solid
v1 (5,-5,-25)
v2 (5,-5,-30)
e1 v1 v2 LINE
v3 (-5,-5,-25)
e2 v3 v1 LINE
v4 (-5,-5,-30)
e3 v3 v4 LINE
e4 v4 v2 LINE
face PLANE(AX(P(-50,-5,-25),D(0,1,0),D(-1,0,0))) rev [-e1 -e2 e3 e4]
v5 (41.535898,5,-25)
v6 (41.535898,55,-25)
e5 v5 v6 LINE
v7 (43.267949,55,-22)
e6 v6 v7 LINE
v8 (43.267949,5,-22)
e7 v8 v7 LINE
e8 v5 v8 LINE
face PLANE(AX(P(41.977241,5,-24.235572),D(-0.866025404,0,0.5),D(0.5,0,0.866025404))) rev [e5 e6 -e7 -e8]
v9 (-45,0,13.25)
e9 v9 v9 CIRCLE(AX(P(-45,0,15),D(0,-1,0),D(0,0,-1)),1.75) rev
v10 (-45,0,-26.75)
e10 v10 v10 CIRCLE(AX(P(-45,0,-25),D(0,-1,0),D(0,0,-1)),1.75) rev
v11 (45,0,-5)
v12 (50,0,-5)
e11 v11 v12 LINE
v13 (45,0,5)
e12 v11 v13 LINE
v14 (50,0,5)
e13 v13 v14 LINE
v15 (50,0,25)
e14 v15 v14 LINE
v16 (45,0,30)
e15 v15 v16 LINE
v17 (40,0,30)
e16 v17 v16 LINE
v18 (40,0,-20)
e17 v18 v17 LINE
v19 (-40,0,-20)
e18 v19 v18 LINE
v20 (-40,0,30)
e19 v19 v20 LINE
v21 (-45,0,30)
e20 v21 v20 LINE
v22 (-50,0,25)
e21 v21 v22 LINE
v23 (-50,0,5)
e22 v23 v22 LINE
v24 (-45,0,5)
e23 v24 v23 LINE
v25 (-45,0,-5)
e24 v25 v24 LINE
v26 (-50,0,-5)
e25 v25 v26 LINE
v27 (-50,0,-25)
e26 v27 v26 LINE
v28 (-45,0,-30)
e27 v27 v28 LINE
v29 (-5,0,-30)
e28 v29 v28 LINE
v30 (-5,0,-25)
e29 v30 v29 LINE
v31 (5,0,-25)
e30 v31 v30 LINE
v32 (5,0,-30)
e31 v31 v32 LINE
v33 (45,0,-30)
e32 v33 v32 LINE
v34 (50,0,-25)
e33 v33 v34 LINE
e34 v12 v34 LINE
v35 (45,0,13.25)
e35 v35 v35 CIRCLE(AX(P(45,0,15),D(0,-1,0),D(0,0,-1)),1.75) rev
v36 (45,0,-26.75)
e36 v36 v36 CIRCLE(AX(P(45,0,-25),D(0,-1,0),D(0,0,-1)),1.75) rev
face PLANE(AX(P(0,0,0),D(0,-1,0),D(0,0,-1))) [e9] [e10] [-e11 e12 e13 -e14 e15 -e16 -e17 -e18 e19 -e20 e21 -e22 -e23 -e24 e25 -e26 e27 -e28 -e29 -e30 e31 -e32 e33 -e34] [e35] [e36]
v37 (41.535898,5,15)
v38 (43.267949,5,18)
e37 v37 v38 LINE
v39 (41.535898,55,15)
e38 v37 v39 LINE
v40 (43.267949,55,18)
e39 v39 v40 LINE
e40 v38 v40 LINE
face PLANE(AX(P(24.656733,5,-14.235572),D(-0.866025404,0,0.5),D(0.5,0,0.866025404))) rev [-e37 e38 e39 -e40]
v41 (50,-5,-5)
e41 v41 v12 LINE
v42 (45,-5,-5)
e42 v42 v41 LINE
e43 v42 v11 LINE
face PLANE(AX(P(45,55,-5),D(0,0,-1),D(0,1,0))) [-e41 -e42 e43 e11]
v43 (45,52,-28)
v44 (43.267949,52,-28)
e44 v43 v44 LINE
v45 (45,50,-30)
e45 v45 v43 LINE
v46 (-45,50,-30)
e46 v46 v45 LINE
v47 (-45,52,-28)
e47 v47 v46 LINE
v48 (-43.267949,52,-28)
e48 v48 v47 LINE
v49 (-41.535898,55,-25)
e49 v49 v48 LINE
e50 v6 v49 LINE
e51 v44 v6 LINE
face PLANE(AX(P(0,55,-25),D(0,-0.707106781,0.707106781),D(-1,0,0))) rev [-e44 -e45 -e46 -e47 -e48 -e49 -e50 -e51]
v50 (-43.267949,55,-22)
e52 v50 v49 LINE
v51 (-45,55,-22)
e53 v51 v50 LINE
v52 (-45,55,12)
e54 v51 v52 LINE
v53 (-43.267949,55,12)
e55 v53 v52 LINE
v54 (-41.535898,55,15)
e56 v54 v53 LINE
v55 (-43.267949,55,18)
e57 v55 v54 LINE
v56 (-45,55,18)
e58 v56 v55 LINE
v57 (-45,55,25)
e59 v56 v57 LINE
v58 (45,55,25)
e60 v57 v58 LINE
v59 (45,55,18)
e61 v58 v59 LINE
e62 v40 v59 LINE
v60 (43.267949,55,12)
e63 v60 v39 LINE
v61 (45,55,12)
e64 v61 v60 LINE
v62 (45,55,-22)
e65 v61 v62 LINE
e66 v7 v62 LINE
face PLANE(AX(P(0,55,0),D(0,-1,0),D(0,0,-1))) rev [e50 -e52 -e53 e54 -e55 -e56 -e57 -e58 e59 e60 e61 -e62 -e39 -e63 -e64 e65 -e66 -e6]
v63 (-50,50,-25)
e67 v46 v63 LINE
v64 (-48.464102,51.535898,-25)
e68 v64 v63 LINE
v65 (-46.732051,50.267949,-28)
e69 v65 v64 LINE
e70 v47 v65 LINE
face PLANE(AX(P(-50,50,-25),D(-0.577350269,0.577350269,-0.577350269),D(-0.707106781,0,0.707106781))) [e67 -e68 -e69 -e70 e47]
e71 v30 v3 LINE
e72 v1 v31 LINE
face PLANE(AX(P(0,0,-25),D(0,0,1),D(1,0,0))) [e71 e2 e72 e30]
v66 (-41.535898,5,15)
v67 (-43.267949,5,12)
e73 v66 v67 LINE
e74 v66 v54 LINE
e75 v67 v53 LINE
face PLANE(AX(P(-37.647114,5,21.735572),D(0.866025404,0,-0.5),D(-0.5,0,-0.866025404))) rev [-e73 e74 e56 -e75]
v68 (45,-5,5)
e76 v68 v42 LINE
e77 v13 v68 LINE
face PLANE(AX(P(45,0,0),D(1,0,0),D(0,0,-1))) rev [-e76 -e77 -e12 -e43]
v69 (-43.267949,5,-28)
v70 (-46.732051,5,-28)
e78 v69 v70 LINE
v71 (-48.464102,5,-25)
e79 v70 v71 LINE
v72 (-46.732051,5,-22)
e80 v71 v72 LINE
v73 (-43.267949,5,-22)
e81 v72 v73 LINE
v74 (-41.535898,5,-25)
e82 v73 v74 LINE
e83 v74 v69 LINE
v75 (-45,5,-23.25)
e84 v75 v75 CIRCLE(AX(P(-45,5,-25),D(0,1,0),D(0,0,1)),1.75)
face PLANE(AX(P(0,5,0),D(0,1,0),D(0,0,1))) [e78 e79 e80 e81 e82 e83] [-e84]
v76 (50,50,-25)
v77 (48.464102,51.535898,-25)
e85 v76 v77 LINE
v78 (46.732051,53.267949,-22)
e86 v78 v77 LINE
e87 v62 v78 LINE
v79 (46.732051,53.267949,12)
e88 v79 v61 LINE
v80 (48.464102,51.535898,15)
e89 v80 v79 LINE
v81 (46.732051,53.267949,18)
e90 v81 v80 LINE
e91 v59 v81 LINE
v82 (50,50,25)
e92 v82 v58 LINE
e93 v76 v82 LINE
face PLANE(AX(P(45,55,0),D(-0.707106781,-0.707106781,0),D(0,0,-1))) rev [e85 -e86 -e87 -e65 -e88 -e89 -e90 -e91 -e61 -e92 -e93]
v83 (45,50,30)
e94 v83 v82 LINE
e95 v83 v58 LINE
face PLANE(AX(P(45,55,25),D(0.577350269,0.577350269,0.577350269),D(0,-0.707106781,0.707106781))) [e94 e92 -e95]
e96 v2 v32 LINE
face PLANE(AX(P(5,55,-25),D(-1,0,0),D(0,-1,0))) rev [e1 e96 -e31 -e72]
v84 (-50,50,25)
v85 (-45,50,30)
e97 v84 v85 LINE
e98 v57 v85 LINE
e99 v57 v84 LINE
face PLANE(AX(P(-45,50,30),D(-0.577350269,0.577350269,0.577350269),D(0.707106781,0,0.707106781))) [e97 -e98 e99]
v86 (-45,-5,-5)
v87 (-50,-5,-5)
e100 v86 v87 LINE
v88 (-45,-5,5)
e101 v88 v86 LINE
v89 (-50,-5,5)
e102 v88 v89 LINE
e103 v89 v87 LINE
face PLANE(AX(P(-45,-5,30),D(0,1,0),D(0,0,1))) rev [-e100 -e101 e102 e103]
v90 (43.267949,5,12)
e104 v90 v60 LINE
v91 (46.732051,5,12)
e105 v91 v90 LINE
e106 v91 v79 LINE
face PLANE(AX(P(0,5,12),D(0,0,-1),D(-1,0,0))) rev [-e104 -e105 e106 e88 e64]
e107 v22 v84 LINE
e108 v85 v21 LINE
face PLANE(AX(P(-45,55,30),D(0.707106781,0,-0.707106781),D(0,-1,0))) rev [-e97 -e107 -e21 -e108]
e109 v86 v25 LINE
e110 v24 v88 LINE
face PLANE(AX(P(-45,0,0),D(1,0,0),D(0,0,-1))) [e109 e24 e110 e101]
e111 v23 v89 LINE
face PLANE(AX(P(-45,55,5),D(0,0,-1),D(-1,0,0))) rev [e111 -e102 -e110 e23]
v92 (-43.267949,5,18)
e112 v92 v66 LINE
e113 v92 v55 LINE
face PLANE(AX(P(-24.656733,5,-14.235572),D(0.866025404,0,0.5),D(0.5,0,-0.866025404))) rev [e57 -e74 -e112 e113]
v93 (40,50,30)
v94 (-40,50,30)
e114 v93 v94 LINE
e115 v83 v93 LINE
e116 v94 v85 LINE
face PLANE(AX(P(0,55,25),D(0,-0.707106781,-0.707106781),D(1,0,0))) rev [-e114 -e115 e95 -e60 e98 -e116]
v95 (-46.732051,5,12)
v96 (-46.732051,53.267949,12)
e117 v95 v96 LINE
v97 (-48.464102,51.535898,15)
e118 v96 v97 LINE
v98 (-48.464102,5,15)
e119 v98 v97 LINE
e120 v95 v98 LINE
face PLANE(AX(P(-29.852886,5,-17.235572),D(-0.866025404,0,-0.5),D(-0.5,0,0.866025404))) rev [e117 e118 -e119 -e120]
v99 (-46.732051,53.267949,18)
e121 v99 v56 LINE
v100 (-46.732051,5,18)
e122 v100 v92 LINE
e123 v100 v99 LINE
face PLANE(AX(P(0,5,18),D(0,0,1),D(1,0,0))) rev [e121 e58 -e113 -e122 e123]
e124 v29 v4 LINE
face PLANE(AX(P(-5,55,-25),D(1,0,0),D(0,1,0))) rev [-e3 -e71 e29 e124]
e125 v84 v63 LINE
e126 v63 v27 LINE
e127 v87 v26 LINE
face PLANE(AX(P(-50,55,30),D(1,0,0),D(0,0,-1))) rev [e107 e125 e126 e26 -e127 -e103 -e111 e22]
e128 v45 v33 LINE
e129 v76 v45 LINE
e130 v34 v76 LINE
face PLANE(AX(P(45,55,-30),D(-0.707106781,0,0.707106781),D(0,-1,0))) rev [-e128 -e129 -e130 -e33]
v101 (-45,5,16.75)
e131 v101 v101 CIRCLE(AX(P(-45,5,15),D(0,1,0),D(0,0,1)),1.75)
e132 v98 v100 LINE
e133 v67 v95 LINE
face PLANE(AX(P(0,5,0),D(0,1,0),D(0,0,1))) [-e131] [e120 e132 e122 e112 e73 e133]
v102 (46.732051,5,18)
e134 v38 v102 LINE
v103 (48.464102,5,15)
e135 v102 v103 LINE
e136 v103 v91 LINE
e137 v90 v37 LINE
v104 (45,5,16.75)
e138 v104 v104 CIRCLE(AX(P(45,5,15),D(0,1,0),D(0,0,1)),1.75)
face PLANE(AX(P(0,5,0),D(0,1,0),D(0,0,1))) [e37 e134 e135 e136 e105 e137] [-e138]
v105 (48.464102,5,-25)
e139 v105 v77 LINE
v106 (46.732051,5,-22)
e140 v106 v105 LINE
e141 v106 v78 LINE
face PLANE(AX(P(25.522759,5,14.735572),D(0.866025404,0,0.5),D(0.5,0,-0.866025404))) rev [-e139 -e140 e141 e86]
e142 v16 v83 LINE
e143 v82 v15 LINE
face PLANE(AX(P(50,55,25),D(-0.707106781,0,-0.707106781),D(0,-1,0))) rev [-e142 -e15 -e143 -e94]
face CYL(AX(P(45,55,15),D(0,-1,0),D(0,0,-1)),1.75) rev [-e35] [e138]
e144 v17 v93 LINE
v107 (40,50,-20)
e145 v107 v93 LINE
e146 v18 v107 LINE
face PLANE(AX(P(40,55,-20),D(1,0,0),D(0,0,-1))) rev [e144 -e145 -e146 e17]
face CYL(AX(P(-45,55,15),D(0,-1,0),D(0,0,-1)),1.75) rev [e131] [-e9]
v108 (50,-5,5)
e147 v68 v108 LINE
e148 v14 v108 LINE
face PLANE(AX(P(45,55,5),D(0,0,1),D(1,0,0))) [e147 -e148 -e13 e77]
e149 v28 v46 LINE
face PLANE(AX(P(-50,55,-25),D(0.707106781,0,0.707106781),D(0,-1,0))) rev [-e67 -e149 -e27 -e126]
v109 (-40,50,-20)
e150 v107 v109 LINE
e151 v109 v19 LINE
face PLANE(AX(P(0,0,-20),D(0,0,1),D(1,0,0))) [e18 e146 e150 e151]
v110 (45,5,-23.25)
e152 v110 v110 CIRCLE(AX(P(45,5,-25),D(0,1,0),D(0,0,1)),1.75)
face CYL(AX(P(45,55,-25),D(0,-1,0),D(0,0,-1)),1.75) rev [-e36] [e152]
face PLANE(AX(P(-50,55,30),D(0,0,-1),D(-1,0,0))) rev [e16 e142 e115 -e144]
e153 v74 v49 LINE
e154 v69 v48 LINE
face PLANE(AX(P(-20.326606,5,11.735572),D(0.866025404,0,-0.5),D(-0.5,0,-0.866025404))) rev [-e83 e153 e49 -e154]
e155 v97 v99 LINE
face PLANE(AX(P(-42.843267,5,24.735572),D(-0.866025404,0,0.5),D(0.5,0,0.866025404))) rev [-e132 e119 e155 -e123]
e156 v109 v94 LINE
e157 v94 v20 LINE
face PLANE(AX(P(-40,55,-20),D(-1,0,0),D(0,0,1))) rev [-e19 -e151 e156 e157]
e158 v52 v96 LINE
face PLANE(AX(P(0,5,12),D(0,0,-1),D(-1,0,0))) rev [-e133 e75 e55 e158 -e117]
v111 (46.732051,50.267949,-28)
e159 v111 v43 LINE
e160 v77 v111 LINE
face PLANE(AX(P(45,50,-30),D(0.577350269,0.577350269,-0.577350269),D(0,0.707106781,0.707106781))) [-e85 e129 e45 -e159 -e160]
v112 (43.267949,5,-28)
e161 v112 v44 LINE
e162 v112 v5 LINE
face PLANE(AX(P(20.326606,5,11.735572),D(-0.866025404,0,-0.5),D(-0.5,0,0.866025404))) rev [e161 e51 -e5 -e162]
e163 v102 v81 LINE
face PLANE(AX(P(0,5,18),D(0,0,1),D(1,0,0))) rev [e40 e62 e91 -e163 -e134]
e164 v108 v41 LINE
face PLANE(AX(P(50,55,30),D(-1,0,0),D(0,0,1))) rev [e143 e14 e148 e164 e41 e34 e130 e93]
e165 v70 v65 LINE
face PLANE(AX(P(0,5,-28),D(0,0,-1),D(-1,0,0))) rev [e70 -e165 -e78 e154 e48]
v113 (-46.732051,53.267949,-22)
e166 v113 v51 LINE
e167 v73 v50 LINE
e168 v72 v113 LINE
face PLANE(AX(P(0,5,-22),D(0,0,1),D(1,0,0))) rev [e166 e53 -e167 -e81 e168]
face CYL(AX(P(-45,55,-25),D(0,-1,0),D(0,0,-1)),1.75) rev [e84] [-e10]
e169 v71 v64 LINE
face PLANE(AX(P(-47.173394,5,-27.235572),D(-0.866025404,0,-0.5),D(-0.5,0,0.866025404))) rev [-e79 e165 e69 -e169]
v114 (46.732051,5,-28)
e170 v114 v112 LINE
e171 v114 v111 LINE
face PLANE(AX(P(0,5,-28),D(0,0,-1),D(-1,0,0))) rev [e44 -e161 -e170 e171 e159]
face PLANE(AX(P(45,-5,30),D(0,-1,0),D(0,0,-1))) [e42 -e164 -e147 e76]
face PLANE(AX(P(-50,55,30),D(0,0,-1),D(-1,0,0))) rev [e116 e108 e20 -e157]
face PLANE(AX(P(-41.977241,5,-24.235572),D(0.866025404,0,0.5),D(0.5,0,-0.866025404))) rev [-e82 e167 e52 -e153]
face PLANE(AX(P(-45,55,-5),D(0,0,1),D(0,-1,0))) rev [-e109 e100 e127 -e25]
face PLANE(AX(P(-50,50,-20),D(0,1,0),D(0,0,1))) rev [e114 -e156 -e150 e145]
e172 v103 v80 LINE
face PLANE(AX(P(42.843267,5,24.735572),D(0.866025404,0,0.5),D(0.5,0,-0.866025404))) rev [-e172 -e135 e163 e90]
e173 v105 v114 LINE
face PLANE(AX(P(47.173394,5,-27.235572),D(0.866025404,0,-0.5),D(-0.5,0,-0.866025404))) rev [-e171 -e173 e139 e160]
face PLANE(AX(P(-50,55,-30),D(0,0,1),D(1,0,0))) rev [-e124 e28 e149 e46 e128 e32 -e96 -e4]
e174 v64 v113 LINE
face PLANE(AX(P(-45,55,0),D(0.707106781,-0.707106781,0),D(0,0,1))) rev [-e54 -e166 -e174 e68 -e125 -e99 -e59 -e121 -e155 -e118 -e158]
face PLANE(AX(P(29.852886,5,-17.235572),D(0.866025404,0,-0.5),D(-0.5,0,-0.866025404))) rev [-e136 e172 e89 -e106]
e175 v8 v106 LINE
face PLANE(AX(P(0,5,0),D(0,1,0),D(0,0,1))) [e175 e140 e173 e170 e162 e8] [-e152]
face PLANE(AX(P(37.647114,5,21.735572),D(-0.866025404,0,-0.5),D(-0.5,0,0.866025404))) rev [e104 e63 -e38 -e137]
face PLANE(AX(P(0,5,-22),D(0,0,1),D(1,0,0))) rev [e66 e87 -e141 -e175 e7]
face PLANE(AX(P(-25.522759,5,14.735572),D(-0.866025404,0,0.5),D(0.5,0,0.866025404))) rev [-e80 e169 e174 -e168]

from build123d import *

# Parameters (mm, degrees)
SKETCH1_W               = 100
SKETCH1_H               = 60
BOSS_EXTRUDE1_DEPTH     = 55
CUT_EXTRUDE1_START      = 30
SKETCH2_W               = 80
SKETCH2_H               = 50
CUT_EXTRUDE1_DEPTH      = 50
CHAMFER2_SIZE           = 5
CUT_EXTRUDE2_DEPTH      = 81.156097709
CUT_EXTRUDE2_DEPTH_BACK = 81.156097709
SKETCH3_R               = 1.75
CUT_EXTRUDE3_START      = 55
CUT_EXTRUDE3_DEPTH      = 50
BOSS_EXTRUDE2_START     = -50
SKETCH5_W               = 10
SKETCH5_H               = 5
BOSS_EXTRUDE2_DEPTH     = 5
BOSS_EXTRUDE3_START     = 50
SKETCH5_2_W             = 10
SKETCH5_2_H             = 5
BOSS_EXTRUDE3_DEPTH     = 5
BOSS_EXTRUDE4_START     = -30
SKETCH7_W               = 10
SKETCH7_H               = 5
BOSS_EXTRUDE4_DEPTH     = 5


with BuildPart() as part:
    # Sketch1 → Boss-Extrude1 (new body)
    with BuildSketch(Plane(origin=(0, 0, 0), x_dir=(1, 0, 0), z_dir=(0, 1, 0))):
        Rectangle(SKETCH1_W, SKETCH1_H)
    extrude(amount=BOSS_EXTRUDE1_DEPTH)

    # Sketch2 → Cut-Extrude1 (cut)
    with BuildSketch(Plane.XY.offset(CUT_EXTRUDE1_START)):
        with Locations((0, 25)):
            Rectangle(SKETCH2_W, SKETCH2_H)
    extrude(amount=-CUT_EXTRUDE1_DEPTH, mode=Mode.SUBTRACT)

    # Chamfer2
    chamfer2_edges = [part.edges().sort_by_distance(p)[0] for p in [
        (-50, 55, 0),
        (0, 55, 30),
        (50, 55, 0),
        (50, 27.5, 30),
        (-50, 27.5, 30),
        (-50, 27.5, -30),
        (50, 27.5, -30),
        (0, 55, -30),
    ]]
    chamfer(chamfer2_edges, length=CHAMFER2_SIZE - 0.0001)  # a hair under: the kernel refuses the full size

    # Sketch3 → Cut-Extrude2 (cut, two sides: drawn at the far end of the back side and taken through both)
    with BuildSketch(Plane(origin=(0, 0, 0), x_dir=(1, 0, 0), z_dir=(0, 1, 0)).offset(-CUT_EXTRUDE2_DEPTH_BACK)):
        with Locations(Location((-45, 25, 0), (0, 0, 90))):
            Circle(SKETCH3_R)
        with Locations(Location((45, 25, 0), (0, 0, 90))):
            Circle(SKETCH3_R)
        with Locations(Location((45, -15, 0), (0, 0, 90))):
            Circle(SKETCH3_R)
        with Locations(Location((-45, -15, 0), (0, 0, 90))):
            Circle(SKETCH3_R)
    extrude(amount=CUT_EXTRUDE2_DEPTH + CUT_EXTRUDE2_DEPTH_BACK, mode=Mode.SUBTRACT)

    # Sketch4 → Cut-Extrude3 (cut)
    with BuildSketch(Plane(origin=(0, 0, 0), x_dir=(1, 0, 0), z_dir=(0, 1, 0)).offset(CUT_EXTRUDE3_START)):
        Polygon((-41.535898385, 25), (-43.267949192, 28), (-46.732050808, 28), (-48.464101615, 25), (-46.732050808, 22), (-43.267949192, 22), align=None)
        Polygon((-41.535898385, -15), (-43.267949192, -12), (-46.732050808, -12), (-48.464101615, -15), (-46.732050808, -18), (-43.267949192, -18), align=None)
        Polygon((48.464101615, 25), (46.732050808, 28), (43.267949192, 28), (41.535898385, 25), (43.267949192, 22), (46.732050808, 22), align=None)
        Polygon((48.464101615, -15), (46.732050808, -12), (43.267949192, -12), (41.535898385, -15), (43.267949192, -18), (46.732050808, -18), align=None)
    extrude(amount=-CUT_EXTRUDE3_DEPTH, mode=Mode.SUBTRACT)

    # Sketch5 → Boss-Extrude2 (add)
    with BuildSketch(Plane(origin=(0, 0, 0), x_dir=(0, 0, -1), z_dir=(1, 0, 0)).offset(BOSS_EXTRUDE2_START)):
        with Locations((0, -2.5)):
            Rectangle(SKETCH5_W, SKETCH5_H)
    extrude(amount=BOSS_EXTRUDE2_DEPTH)

    # Sketch5<2> → Boss-Extrude3 (add)
    with BuildSketch(Plane(origin=(0, 0, 0), x_dir=(0, 0, -1), z_dir=(1, 0, 0)).offset(BOSS_EXTRUDE3_START)):
        with Locations((0, -2.5)):
            Rectangle(SKETCH5_2_W, SKETCH5_2_H)
    extrude(amount=-BOSS_EXTRUDE3_DEPTH)

    # Sketch7 → Boss-Extrude4 (add)
    with BuildSketch(Plane.XY.offset(BOSS_EXTRUDE4_START)):
        with Locations((0, -2.5)):
            Rectangle(SKETCH7_W, SKETCH7_H)
    extrude(amount=BOSS_EXTRUDE4_DEPTH)


solid = part.part
